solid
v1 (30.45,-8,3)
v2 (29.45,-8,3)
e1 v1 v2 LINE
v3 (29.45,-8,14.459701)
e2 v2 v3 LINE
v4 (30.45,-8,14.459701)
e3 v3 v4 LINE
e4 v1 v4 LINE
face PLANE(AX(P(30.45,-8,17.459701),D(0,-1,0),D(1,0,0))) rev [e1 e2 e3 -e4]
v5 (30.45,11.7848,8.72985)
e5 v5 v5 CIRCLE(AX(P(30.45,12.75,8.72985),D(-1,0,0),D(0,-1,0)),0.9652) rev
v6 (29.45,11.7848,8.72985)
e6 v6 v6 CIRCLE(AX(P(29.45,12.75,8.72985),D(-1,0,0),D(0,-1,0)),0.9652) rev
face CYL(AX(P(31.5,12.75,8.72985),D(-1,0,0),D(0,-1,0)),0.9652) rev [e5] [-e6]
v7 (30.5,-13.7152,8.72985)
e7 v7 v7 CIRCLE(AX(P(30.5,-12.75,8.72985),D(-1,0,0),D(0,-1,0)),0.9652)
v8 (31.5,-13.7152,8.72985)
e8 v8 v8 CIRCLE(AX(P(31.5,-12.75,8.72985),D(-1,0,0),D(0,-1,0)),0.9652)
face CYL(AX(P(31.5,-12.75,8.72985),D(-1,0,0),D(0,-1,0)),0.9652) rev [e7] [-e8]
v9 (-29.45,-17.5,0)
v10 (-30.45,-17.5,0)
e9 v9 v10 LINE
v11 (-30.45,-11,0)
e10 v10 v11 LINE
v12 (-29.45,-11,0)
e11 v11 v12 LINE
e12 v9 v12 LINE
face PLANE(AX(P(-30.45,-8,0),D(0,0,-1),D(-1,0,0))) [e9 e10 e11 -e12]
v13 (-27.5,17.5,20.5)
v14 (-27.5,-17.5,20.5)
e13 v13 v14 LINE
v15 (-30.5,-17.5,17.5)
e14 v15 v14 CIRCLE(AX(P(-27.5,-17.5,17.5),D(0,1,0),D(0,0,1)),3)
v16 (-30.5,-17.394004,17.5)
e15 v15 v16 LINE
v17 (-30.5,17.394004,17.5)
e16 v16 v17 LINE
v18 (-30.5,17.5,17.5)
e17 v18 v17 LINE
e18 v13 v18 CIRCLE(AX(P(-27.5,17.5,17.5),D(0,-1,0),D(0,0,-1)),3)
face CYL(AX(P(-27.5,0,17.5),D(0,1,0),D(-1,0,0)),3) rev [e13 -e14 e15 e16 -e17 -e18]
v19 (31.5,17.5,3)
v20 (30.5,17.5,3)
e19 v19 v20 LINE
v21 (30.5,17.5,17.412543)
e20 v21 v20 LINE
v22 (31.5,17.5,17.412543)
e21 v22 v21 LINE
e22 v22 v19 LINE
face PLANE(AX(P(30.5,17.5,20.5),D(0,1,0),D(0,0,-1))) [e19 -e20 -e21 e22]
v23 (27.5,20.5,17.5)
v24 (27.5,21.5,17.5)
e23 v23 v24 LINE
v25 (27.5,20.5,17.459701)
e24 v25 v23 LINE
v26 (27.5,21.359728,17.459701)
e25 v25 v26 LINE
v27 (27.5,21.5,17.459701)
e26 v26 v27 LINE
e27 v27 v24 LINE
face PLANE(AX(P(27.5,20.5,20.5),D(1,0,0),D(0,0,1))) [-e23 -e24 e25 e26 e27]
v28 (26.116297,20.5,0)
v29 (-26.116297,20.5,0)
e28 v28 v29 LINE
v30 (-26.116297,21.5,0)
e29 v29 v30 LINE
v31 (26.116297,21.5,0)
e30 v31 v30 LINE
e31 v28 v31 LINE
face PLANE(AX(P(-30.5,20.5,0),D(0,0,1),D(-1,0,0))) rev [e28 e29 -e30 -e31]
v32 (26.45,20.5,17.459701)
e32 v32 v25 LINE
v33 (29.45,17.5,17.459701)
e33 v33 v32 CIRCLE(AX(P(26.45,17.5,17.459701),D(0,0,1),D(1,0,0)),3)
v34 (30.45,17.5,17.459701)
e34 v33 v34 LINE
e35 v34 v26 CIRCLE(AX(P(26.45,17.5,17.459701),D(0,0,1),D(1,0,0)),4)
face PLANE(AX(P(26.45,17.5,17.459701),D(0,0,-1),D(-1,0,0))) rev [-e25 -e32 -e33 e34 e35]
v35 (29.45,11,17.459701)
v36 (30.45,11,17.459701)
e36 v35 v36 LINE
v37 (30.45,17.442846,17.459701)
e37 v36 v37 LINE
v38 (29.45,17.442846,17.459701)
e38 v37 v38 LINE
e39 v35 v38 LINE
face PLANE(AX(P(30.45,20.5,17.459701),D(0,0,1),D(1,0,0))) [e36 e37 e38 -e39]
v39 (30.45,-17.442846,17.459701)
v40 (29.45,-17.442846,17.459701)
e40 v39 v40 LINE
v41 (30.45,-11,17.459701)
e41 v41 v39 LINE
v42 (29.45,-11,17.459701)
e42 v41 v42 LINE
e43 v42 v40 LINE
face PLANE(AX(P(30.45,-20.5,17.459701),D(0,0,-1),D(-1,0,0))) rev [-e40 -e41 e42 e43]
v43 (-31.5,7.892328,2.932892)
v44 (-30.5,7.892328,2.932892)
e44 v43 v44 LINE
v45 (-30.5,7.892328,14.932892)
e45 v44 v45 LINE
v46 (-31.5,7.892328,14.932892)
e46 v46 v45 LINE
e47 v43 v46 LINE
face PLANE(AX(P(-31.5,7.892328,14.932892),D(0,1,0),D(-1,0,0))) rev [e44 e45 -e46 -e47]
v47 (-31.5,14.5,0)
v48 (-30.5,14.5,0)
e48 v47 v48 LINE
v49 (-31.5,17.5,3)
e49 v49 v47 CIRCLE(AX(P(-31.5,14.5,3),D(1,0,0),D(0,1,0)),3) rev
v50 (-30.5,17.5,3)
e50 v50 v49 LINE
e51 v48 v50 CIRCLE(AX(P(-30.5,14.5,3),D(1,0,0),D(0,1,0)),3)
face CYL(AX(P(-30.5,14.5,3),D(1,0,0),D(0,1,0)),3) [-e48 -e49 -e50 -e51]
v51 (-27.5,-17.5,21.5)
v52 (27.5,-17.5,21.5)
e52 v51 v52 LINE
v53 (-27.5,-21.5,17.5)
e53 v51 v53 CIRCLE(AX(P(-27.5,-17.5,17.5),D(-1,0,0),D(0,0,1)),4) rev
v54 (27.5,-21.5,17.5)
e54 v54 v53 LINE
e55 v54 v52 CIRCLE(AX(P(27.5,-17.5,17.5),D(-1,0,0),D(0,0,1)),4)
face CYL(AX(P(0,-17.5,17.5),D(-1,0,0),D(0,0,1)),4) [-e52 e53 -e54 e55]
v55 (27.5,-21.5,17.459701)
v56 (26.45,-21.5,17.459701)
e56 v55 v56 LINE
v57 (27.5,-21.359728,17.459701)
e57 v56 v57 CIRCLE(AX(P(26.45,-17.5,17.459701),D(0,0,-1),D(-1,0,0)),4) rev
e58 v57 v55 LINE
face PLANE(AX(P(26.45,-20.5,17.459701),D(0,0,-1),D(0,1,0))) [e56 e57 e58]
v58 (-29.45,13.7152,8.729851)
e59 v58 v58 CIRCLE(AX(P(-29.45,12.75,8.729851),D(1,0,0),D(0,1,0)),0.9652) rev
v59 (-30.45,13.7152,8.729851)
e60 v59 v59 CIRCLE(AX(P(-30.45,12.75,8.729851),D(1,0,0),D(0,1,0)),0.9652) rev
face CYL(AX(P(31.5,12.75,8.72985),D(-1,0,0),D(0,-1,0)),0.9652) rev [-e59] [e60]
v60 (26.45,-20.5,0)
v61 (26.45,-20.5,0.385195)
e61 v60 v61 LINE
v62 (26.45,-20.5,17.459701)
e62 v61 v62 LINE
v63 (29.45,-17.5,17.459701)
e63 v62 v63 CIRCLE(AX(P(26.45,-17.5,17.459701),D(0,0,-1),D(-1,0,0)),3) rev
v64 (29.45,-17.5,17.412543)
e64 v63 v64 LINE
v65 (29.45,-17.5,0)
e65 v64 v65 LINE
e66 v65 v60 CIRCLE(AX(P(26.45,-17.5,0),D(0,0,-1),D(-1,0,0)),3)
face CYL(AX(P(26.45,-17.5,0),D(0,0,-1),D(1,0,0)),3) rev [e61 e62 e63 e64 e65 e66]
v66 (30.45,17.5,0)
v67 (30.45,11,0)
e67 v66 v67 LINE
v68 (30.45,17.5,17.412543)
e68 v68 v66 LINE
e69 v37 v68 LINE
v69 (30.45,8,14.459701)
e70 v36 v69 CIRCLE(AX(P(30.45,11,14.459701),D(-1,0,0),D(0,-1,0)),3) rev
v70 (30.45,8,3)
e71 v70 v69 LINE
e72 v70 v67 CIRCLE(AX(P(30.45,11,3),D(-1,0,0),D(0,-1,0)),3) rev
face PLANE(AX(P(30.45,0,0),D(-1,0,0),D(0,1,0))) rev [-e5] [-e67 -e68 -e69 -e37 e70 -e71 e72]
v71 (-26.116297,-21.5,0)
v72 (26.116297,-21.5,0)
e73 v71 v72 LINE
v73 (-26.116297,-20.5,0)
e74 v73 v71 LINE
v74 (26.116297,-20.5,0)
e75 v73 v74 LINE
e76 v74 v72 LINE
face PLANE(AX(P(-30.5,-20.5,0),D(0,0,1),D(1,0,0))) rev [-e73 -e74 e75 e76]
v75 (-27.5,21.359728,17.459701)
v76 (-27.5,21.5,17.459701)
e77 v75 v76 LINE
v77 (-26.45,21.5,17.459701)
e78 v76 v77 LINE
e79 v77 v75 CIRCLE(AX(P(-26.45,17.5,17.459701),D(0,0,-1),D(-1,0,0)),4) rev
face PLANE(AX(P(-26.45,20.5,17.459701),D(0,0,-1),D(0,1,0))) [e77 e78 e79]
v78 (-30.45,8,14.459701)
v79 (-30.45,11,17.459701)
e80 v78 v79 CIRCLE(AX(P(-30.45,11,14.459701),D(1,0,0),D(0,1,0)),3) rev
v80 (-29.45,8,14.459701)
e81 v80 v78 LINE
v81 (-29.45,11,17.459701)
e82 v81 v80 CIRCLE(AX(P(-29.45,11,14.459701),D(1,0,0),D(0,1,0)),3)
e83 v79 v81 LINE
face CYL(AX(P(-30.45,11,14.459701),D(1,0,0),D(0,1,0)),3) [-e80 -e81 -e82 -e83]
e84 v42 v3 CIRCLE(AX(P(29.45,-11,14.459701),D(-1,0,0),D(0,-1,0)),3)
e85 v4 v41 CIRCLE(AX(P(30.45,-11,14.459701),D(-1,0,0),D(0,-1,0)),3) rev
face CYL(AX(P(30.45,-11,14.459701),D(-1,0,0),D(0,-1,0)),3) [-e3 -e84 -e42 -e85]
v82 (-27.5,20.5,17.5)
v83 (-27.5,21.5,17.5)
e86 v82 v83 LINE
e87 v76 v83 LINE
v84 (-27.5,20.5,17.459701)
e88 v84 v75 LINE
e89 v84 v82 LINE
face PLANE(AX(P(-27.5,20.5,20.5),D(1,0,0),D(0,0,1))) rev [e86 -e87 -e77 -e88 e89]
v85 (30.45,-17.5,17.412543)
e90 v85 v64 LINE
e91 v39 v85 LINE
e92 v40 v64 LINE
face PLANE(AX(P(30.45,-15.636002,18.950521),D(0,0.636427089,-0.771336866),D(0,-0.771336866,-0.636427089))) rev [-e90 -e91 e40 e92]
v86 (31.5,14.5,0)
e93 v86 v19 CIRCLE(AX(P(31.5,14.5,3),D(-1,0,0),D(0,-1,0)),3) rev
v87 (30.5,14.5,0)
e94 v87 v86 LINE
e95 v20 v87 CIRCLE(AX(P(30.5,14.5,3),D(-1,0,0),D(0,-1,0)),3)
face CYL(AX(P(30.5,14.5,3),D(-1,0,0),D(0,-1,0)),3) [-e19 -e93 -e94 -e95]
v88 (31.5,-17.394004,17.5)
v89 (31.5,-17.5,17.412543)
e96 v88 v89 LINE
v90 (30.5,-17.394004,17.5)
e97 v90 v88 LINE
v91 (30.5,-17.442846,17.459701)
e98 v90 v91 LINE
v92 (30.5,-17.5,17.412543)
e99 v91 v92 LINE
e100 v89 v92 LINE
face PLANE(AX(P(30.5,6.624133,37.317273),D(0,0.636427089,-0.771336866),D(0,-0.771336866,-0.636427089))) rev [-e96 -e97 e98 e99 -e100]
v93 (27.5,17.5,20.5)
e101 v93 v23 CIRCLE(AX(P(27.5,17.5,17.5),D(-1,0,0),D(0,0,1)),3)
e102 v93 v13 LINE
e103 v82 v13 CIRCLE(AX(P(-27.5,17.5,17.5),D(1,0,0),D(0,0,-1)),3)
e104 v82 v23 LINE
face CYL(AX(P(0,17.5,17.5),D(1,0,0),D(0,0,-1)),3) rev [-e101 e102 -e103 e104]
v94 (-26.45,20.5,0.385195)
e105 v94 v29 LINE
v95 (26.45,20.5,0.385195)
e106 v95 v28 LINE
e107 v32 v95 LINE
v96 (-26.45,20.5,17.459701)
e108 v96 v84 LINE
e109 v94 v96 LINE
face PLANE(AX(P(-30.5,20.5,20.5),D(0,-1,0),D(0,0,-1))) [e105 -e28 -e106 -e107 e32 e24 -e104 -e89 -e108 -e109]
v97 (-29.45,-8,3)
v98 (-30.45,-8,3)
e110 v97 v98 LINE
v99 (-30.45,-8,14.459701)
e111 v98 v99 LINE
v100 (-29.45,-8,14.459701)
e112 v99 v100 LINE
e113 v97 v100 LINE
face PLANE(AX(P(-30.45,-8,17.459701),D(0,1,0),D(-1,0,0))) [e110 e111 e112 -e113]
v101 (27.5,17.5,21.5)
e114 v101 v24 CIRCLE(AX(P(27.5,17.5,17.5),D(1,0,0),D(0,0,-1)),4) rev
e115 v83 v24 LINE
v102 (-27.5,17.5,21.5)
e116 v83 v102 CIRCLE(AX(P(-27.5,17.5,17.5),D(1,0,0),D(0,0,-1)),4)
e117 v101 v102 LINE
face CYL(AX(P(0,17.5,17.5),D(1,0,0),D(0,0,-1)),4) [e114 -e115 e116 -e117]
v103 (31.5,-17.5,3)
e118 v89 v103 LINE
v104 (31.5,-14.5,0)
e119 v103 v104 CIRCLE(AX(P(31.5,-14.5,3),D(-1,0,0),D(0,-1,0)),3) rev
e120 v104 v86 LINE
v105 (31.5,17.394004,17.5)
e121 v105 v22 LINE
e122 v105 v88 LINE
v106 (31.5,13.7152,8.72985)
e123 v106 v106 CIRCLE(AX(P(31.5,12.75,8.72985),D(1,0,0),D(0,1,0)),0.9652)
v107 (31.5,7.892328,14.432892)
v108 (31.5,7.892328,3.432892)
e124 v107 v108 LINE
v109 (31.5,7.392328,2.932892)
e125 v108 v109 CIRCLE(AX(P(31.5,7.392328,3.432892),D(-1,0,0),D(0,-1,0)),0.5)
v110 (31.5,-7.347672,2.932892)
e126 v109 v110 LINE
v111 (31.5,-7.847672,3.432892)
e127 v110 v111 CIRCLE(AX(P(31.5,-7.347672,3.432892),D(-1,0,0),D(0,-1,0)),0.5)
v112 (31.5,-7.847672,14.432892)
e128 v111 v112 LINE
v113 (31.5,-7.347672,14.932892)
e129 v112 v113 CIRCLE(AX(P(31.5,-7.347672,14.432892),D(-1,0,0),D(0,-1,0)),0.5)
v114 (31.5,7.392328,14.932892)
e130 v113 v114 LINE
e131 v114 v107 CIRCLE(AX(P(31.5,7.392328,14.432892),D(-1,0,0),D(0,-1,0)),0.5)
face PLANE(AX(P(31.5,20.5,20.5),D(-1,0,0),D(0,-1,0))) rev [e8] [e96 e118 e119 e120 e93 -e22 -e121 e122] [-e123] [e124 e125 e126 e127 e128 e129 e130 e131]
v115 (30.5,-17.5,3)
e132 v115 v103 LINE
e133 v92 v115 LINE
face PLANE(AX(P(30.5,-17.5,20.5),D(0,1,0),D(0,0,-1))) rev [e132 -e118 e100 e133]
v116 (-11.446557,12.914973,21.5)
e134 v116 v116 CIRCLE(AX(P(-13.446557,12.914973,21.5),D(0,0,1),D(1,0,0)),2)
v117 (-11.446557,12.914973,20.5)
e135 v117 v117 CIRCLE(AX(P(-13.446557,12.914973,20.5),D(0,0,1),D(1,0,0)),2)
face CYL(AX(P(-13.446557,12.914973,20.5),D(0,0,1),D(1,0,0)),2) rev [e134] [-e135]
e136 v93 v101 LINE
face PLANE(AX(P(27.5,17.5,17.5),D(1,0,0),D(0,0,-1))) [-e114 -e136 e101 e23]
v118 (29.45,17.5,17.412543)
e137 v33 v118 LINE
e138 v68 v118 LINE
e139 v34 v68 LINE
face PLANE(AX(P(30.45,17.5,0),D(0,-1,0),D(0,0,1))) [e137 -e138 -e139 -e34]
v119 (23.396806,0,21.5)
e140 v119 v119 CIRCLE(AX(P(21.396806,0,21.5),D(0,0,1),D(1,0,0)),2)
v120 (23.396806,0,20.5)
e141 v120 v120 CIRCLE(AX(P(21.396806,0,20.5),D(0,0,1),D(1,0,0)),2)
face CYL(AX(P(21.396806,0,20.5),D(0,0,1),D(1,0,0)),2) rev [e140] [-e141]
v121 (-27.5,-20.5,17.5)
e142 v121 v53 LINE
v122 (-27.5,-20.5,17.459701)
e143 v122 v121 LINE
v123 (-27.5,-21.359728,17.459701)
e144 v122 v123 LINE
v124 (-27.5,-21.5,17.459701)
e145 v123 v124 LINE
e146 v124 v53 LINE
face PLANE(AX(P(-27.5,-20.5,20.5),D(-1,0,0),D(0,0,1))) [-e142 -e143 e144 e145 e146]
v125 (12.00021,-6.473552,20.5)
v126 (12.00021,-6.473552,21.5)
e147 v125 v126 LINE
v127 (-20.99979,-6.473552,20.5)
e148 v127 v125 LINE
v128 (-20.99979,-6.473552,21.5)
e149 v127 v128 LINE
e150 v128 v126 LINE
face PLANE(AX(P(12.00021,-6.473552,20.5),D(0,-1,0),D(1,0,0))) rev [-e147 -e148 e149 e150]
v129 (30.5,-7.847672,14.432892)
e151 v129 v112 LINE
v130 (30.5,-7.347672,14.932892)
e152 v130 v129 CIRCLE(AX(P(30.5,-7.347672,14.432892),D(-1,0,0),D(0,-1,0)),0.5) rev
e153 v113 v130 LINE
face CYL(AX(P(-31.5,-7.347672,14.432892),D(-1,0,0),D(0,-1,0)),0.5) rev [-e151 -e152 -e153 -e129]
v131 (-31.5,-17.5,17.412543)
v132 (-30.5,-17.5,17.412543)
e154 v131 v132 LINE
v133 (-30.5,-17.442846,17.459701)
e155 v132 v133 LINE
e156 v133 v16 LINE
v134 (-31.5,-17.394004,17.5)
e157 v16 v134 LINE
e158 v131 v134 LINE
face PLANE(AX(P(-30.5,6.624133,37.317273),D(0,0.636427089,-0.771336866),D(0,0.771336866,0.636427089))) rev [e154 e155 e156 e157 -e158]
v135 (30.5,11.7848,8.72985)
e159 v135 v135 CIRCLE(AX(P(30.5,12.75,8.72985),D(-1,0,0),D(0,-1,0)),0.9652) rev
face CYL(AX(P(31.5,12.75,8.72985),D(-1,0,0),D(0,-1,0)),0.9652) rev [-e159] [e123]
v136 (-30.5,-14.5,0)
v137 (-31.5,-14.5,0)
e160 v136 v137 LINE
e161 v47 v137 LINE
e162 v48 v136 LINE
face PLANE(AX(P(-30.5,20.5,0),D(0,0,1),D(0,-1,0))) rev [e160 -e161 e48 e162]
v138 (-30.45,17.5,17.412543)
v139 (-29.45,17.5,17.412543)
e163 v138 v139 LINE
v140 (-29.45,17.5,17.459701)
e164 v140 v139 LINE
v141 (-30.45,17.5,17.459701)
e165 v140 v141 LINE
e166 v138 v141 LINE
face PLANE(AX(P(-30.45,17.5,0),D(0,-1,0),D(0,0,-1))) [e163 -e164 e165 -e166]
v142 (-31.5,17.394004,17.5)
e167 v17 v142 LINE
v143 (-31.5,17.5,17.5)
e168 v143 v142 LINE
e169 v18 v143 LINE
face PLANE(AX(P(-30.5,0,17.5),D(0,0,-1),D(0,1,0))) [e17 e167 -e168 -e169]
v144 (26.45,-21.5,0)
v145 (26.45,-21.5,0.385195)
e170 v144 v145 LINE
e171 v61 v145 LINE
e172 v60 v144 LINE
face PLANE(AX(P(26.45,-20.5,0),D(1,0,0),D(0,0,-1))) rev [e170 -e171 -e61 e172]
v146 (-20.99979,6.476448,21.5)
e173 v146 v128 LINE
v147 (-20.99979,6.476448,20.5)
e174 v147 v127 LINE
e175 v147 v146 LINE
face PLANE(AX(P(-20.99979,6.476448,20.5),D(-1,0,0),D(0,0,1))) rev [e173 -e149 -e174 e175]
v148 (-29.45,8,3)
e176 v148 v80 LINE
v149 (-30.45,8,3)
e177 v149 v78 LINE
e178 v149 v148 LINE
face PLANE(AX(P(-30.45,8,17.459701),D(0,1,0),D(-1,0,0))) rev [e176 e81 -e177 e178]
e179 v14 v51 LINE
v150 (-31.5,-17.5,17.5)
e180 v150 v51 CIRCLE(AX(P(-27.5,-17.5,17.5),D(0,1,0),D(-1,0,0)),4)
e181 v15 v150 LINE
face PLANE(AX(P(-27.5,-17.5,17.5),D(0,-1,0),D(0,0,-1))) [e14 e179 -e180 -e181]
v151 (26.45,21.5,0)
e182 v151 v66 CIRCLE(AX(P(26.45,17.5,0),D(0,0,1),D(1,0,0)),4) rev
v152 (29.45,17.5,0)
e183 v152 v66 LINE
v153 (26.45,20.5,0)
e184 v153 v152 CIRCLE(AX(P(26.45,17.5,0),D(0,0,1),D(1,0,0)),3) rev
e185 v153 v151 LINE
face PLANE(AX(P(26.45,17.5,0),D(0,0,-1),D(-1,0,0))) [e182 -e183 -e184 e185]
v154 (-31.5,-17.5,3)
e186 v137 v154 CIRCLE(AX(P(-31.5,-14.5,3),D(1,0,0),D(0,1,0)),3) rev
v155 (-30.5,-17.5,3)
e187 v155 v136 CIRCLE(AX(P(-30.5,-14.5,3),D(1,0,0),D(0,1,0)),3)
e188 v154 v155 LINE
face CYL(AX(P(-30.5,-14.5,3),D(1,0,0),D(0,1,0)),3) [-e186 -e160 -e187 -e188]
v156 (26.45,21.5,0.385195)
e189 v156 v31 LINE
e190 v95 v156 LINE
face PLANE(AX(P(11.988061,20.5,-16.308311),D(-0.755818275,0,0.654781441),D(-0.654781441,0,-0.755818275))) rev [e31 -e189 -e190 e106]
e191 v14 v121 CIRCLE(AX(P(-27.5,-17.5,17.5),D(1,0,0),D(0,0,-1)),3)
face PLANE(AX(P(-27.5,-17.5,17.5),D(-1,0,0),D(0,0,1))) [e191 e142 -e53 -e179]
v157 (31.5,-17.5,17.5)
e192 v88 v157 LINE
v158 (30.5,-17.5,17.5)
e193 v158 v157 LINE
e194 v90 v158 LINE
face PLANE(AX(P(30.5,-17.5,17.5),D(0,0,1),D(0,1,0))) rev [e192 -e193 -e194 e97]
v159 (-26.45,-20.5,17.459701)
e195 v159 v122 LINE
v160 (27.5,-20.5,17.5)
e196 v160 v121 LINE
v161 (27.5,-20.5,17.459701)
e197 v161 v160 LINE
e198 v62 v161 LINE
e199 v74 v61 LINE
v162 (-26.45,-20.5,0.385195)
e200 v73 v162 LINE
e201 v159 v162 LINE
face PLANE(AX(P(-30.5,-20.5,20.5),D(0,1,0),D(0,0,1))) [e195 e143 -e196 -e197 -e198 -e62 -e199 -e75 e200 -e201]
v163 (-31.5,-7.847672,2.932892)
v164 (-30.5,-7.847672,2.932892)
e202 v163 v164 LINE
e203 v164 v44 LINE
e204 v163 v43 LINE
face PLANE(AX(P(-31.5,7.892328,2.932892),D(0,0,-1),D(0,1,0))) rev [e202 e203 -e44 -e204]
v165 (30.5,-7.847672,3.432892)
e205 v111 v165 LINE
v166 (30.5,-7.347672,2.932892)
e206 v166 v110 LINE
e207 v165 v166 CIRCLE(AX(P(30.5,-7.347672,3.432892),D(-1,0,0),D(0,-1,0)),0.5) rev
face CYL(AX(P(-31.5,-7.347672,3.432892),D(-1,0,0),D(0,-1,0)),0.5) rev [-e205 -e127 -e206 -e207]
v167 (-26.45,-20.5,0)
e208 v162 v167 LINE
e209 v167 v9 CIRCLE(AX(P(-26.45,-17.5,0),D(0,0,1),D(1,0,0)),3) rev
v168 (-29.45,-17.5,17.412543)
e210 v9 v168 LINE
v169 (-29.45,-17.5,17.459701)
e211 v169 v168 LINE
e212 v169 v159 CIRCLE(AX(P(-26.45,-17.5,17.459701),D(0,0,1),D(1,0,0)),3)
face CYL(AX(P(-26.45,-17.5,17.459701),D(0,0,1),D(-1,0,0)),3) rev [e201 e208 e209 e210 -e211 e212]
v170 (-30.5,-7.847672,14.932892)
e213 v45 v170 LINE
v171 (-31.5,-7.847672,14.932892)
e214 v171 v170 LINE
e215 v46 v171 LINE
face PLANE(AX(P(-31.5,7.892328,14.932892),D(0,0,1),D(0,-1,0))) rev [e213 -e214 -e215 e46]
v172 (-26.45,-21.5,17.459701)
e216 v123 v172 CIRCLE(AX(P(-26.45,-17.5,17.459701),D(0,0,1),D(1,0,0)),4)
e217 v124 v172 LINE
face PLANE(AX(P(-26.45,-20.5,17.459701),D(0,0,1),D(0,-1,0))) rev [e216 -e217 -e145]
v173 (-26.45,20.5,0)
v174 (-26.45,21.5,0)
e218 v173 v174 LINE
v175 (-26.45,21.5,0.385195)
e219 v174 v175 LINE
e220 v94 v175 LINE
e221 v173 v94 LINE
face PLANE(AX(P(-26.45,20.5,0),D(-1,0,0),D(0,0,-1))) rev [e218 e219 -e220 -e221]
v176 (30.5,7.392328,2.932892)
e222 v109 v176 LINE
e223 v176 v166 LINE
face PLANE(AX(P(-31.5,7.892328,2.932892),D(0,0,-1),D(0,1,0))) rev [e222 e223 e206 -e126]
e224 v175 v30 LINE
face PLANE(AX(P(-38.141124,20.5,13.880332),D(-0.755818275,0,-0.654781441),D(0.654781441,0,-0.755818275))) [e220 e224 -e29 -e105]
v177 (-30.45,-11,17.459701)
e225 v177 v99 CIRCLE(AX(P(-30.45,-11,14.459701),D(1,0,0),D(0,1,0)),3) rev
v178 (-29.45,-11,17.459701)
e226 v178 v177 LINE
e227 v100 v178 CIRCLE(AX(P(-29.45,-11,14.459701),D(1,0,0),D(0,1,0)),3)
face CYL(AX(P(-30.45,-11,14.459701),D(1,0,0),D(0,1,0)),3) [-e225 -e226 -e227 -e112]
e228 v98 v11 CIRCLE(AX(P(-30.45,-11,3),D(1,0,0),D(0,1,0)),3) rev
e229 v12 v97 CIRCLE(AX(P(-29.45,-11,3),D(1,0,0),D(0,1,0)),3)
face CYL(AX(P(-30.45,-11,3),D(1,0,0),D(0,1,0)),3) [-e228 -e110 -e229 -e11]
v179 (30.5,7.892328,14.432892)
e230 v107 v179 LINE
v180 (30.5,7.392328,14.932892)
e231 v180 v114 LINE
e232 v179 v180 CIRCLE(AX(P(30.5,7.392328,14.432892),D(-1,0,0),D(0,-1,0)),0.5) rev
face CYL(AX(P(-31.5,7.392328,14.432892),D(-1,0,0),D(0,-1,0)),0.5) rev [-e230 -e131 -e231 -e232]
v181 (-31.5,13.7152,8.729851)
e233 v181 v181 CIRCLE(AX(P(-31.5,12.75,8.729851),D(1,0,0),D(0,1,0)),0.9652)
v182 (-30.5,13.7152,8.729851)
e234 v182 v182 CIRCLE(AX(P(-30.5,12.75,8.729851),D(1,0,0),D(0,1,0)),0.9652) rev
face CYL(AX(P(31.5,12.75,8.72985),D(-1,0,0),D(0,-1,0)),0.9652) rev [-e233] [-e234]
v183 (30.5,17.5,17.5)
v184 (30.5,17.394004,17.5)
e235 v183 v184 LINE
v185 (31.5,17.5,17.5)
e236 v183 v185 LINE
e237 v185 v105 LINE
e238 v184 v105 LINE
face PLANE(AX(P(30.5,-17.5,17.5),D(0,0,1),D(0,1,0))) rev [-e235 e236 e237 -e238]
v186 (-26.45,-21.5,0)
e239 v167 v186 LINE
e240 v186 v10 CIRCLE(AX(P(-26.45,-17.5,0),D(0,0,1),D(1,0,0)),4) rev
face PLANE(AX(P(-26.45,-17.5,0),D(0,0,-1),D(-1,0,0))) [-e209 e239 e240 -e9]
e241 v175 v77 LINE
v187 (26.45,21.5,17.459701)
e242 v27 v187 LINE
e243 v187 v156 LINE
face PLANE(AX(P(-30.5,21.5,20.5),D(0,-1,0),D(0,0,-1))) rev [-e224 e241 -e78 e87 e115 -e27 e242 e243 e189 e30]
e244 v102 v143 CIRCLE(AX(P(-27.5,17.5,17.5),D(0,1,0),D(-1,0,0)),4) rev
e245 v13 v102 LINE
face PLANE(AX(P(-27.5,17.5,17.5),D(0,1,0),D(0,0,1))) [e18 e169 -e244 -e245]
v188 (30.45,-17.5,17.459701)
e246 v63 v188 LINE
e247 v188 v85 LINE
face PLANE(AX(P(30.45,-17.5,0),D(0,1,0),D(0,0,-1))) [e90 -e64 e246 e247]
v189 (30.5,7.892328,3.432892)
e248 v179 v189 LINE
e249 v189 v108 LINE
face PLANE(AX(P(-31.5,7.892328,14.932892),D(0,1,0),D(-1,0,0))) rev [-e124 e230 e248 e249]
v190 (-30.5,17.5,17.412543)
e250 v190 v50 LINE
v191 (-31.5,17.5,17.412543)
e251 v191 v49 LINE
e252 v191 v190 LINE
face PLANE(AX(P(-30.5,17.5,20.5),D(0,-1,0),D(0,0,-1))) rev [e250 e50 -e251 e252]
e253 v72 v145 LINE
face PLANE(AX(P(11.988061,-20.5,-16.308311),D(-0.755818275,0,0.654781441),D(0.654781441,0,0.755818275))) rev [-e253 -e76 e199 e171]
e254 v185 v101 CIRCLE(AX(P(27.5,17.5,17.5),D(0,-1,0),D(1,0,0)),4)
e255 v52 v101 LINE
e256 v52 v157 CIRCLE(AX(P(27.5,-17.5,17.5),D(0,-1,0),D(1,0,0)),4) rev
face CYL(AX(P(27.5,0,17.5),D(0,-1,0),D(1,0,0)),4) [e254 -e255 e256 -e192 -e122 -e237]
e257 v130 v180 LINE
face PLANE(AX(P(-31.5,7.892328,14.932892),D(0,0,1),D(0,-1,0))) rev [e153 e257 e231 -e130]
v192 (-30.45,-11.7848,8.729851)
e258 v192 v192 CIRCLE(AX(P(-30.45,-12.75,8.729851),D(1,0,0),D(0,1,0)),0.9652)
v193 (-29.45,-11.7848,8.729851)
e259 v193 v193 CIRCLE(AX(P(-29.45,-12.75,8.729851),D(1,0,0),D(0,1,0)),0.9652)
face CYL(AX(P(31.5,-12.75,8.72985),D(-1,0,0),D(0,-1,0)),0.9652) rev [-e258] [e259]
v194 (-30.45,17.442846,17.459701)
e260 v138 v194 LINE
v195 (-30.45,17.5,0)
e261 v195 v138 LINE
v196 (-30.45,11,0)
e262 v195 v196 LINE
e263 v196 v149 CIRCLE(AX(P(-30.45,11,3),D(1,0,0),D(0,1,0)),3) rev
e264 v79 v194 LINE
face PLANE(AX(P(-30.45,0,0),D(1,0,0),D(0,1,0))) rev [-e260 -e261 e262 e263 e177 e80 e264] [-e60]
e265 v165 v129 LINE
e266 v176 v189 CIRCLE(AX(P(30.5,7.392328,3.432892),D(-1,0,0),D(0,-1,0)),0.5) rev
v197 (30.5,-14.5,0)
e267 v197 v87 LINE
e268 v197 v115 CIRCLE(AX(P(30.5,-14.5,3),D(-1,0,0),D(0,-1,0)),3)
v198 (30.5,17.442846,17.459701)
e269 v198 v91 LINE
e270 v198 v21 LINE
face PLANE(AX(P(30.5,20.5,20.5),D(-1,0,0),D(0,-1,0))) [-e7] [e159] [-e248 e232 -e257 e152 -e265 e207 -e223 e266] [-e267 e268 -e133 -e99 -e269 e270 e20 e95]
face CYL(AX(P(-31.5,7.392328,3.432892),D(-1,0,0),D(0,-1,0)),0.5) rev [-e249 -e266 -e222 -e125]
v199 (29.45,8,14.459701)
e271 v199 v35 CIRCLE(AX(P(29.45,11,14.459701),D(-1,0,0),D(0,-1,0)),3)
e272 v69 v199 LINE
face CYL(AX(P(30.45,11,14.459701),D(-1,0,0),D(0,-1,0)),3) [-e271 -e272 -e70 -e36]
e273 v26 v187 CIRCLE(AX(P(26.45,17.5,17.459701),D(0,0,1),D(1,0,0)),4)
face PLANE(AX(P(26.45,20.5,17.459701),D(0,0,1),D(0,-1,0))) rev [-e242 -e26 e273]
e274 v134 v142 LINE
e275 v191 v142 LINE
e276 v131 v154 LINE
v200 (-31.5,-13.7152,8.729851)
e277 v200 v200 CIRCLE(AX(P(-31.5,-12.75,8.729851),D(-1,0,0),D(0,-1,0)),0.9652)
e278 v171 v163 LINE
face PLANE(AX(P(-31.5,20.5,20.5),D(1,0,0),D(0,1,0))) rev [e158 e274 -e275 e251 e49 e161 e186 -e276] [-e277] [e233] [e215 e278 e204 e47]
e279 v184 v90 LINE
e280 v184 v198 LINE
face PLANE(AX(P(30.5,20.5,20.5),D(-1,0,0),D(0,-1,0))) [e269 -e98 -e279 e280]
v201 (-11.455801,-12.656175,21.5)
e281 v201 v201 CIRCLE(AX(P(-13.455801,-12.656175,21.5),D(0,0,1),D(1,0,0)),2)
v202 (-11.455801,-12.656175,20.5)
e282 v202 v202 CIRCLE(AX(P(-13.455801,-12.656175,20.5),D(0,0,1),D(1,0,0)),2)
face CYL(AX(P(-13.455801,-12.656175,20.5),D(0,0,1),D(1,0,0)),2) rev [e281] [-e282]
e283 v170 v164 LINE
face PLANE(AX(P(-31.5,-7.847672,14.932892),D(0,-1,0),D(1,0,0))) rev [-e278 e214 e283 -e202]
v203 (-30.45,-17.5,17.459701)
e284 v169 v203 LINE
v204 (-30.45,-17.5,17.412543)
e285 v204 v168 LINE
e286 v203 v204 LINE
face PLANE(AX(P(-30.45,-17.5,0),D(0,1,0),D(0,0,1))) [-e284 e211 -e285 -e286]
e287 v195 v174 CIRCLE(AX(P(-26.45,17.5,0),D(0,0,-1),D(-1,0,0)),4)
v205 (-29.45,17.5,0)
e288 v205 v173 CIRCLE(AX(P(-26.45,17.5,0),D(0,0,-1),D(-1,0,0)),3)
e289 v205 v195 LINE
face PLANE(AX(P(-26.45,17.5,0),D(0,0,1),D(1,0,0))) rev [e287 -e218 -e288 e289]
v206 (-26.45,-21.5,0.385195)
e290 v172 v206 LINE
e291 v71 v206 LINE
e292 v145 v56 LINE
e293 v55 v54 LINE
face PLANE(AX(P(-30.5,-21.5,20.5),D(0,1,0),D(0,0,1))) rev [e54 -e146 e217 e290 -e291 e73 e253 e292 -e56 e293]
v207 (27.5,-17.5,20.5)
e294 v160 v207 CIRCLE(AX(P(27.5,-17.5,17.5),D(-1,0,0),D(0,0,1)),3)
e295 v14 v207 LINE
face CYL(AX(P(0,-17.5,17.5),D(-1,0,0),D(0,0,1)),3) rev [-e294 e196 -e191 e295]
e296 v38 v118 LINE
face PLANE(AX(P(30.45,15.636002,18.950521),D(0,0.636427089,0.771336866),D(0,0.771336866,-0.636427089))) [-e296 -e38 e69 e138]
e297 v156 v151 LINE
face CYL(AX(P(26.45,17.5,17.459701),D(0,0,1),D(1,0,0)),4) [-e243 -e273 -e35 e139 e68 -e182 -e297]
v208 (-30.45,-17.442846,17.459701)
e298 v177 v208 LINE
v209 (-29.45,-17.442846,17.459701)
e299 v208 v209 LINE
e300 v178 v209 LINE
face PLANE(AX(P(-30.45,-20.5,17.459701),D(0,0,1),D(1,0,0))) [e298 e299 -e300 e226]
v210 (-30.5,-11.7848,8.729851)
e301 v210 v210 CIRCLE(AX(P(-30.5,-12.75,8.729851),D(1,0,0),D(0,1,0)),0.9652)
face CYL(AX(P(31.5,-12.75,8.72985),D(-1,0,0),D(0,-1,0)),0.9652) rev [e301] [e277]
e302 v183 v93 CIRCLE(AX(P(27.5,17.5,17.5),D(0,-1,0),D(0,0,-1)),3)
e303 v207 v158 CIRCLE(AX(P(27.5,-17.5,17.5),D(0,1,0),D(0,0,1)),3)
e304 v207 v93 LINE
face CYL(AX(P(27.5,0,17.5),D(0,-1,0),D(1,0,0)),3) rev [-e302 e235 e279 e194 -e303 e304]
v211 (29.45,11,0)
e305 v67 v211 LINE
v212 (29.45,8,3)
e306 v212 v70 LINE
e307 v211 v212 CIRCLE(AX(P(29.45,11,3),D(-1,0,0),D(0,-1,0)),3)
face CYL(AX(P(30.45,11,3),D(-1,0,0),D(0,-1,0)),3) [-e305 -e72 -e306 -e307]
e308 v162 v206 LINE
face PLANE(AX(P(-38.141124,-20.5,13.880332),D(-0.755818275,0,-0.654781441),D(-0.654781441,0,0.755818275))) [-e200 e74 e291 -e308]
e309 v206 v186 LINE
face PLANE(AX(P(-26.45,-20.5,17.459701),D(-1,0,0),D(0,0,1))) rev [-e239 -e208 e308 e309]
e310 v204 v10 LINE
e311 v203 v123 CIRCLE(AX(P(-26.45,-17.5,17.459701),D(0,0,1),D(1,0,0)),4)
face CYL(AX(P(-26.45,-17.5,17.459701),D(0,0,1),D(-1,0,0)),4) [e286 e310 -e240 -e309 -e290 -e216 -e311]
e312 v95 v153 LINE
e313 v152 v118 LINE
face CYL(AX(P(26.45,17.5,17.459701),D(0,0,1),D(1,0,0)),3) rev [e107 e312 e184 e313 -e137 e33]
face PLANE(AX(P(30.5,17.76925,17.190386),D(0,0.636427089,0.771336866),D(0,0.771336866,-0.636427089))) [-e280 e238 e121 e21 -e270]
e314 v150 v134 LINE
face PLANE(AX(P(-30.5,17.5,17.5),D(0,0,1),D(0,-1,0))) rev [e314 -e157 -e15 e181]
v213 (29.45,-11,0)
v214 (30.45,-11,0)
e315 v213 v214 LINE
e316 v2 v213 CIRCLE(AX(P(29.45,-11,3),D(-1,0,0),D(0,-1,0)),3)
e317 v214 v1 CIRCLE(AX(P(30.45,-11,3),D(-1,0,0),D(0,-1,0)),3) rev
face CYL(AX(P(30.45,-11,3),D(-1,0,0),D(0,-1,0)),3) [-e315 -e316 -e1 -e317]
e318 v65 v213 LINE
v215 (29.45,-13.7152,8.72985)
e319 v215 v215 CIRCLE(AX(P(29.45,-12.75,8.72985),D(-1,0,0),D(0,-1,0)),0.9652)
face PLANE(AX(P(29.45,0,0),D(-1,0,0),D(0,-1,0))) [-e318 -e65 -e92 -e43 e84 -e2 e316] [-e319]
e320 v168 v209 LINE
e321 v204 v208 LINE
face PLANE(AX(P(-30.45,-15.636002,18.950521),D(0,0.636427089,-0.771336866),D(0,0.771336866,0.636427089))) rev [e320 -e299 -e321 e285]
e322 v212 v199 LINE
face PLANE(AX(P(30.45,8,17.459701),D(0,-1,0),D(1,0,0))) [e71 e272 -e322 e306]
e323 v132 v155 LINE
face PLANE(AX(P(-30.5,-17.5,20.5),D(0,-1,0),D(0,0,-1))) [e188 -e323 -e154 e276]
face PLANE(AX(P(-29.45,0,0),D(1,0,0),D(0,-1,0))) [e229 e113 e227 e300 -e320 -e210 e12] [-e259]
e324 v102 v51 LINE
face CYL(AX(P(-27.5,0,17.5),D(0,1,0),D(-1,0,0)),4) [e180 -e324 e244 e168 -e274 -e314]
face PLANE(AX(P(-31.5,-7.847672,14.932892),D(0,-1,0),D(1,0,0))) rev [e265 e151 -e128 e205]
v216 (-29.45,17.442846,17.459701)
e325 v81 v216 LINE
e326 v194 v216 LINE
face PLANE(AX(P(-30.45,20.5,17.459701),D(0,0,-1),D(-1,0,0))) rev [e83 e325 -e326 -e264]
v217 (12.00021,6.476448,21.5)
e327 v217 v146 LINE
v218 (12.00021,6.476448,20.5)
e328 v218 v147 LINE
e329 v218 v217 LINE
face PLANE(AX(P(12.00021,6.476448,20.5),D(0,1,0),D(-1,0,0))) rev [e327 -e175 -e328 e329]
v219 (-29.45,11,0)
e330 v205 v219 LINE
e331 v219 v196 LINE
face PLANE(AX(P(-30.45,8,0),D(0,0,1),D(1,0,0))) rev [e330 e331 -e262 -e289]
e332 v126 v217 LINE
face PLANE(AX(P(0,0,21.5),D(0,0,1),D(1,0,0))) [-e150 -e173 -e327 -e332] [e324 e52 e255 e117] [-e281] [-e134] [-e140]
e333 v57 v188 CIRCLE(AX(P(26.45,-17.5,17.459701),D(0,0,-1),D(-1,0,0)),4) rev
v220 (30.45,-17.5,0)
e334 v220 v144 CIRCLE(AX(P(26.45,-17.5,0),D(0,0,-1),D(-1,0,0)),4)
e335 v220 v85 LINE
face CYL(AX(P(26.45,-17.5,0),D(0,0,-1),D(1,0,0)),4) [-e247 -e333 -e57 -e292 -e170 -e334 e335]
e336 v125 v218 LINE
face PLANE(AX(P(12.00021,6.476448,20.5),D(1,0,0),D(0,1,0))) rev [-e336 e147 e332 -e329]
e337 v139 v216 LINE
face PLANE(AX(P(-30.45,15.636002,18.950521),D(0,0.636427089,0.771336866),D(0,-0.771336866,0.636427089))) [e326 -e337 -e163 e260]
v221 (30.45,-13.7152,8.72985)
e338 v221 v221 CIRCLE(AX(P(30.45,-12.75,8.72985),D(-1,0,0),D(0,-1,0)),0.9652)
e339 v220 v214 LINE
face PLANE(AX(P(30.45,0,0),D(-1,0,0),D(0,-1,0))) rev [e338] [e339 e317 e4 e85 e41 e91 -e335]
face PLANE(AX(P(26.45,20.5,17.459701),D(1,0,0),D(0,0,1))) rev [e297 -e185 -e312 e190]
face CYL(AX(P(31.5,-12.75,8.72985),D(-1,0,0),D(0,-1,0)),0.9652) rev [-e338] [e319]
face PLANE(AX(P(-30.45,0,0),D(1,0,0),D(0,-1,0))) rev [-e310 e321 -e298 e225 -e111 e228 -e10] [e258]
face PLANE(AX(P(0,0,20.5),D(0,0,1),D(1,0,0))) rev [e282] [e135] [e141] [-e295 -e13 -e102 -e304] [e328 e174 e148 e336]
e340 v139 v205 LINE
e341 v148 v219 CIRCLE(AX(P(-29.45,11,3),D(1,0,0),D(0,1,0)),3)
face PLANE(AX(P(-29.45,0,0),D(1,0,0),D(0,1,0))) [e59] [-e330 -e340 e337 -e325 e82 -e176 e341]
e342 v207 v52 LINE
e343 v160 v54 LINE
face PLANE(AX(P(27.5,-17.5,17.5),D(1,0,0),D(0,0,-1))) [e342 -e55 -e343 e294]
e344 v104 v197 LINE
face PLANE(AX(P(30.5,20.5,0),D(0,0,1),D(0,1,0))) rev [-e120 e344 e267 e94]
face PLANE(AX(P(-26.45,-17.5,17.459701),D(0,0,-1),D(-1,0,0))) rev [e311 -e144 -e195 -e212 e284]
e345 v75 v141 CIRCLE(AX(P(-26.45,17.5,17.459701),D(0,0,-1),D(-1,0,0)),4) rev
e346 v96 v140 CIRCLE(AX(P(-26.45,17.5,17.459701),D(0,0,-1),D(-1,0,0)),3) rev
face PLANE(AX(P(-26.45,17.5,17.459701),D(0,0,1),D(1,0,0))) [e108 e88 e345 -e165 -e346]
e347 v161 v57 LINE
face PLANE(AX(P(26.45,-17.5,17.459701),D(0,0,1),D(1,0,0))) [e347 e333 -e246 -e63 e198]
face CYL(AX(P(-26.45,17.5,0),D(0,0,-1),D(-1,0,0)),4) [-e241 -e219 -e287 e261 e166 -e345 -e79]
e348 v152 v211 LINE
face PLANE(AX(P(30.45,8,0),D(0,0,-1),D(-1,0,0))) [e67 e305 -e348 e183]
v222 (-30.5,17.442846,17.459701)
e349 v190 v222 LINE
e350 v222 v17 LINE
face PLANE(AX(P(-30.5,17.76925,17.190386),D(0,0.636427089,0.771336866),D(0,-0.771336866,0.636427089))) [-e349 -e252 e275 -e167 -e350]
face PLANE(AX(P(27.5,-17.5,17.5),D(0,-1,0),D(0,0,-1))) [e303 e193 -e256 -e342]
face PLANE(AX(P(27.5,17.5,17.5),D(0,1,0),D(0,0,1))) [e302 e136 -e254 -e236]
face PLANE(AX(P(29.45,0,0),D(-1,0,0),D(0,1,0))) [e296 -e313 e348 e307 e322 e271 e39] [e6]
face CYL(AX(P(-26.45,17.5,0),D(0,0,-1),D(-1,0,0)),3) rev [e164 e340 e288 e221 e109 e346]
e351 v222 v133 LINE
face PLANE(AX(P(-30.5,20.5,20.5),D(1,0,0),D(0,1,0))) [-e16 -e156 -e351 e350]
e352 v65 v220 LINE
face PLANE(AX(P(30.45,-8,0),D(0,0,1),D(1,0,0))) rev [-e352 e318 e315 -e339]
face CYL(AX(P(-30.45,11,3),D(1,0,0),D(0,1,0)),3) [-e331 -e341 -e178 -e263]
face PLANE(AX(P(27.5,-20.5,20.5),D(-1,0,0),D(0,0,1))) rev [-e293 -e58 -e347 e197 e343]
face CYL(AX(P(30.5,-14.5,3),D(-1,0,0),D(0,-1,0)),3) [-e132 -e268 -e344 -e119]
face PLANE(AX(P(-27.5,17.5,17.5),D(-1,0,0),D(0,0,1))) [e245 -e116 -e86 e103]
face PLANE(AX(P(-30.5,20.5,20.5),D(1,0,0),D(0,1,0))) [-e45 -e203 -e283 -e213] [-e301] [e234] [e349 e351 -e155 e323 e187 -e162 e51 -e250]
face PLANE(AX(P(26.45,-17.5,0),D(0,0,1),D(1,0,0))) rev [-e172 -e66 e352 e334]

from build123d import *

# Parameters (mm, degrees)
SKETCH1_W                        = 61
SKETCH1_H                        = 41
MAIN_BODY_DEPTH                  = 20.5
CONVERT_SOLID1_START             = -30.5
CONVERT_SOLID1_DEPTH             = 61
CONVERT_SOLID1_2_DEPTH           = 3
CONVERT_SOLID1_START_2           = 27.5
CONVERT_SOLID1_3_DEPTH           = 3
CONVERT_SOLID1_START_3           = -27.5
CONVERT_SOLID1_4_DEPTH           = 55
CONVERT_SOLID1_5_OUTLINE_W       = 1
CONVERT_SOLID1_5_OUTLINE_H       = 17.459701
CONVERT_SOLID1_5_DEPTH           = 61
CONVERT_SOLID1_START_4           = -17.5
CONVERT_SOLID1_6_DEPTH           = 35
CONVERT_SOLID1_7_DEPTH           = 35
CONVERT_SOLID1_8_DEPTH           = 61
SKETCH11_W                       = 0.05
SKETCH11_H                       = 17.459701
TRIM_FOR_TABS_DEPTH              = 58.476081982
CORNER_TAB_STRIP_W               = 10
CORNER_TAB_STRIP_H               = 1
CORNER_TAB_STRIP_CUT_DEPTH       = 17.459701
CORNER_TAB_DEPTH                 = 17.459701
TAB_MIRROR_HORIZ_COPY_1_SKETCH_W = 10
TAB_MIRROR_HORIZ_COPY_1_SKETCH_H = 1
TAB_MIRROR_HORIZ_COPY_1_DEPTH    = 17.459701
TAB_MIRROR_HORIZ_COPY_2_DEPTH    = 17.459701
SKETCH16_R                       = 0.9652
SCREW_HOLES_DEPTH                = 69.113159521
RJ45_HOLES_DEPTH                 = 70.953556021
RJ45_HOLES_DEPTH_BACK            = 70.953556021
SKETCH17_W                       = 12
SKETCH17_H                       = 15.74
FILLET1_R                        = 0.5
SKETCH18_R                       = 2
SKETCH18_W                       = 33
SKETCH18_H                       = 12.95
CUT_EXTRUDE4_DEPTH               = 10
BREAK_CORNER1_START              = -30.5
BREAK_CORNER1_DEPTH              = 61
BREAK_CORNER1_START_2            = -32
BREAK_CORNER1_2_DEPTH            = 1.55
BREAK_CORNER1_START_3            = 30.45
BREAK_CORNER1_3_DEPTH            = 1.55
FOLD_MARKING_NOTCHES_DEPTH       = 58.476081982
FOLD_MARKING_NOTCHES_2_DEPTH     = 70.953556021


with BuildPart() as part:
    # Sketch1 → main body (new body)
    with BuildSketch(Plane.XY):
        Rectangle(SKETCH1_W, SKETCH1_H)
    extrude(amount=MAIN_BODY_DEPTH)

    # Convert-Solid1: read off the stored shape, not the designer's step
    # Convert-Solid1 outline → Convert-Solid1 (cut)
    with BuildSketch(Plane.YZ.offset(CONVERT_SOLID1_START)):
        with BuildLine():
            Line((17.5, 20.5), (17.5, 0))
            Line((17.5, 0), (20.5, 0))
            Line((20.5, 0), (20.5, 17.5))
            ThreePointArc((20.5, 17.5), (19.621320344, 19.621320344), (17.5, 20.5))
        make_face()
        with BuildLine():
            Line((-20.5, 0), (-17.5, 0))
            Line((-17.5, 0), (-17.5, 20.5))
            ThreePointArc((-17.5, 20.5), (-19.621320344, 19.621320344), (-20.5, 17.5))
            Line((-20.5, 17.5), (-20.5, 0))
        make_face()
    extrude(amount=CONVERT_SOLID1_DEPTH, mode=Mode.SUBTRACT)

    # Convert-Solid1 2 outline → Convert-Solid1 2 (cut)
    with BuildSketch(Plane.YZ.offset(CONVERT_SOLID1_START)):
        with BuildLine():
            Line((17.5, 21.5), (17.5, 20.5))
            ThreePointArc((17.5, 20.5), (19.621320344, 19.621320344), (20.5, 17.5))
            Line((20.5, 17.5), (20.5, 20.145751312))
            ThreePointArc((20.5, 20.145751312), (19.145751311, 21.145751311), (17.5, 21.5))
        make_face()
        with BuildLine():
            ThreePointArc((-20.5, 17.5), (-19.621320344, 19.621320344), (-17.5, 20.5))
            Line((-17.5, 20.5), (-17.5, 21.5))
            ThreePointArc((-17.5, 21.5), (-19.145751311, 21.145751311), (-20.5, 20.145751312))
            Line((-20.5, 20.145751312), (-20.5, 17.5))
        make_face()
    extrude(amount=CONVERT_SOLID1_2_DEPTH, mode=Mode.SUBTRACT)

    # Convert-Solid1 3 outline → Convert-Solid1 3 (cut)
    with BuildSketch(Plane.YZ.offset(CONVERT_SOLID1_START_2)):
        with BuildLine():
            Line((17.5, 21.5), (17.5, 20.5))
            ThreePointArc((17.5, 20.5), (19.621320344, 19.621320344), (20.5, 17.5))
            Line((20.5, 17.5), (20.5, 20.145751312))
            ThreePointArc((20.5, 20.145751312), (19.145751311, 21.145751311), (17.5, 21.5))
        make_face()
        with BuildLine():
            ThreePointArc((-20.5, 17.5), (-19.621320344, 19.621320344), (-17.5, 20.5))
            Line((-17.5, 20.5), (-17.5, 21.5))
            ThreePointArc((-17.5, 21.5), (-19.145751311, 21.145751311), (-20.5, 20.145751312))
            Line((-20.5, 20.145751312), (-20.5, 17.5))
        make_face()
    extrude(amount=CONVERT_SOLID1_3_DEPTH, mode=Mode.SUBTRACT)

    # Convert-Solid1 4 outline → Convert-Solid1 4 (add)
    with BuildSketch(Plane.YZ.offset(CONVERT_SOLID1_START_3)):
        with BuildLine():
            Line((20.5, 0), (21.5, 0))
            Line((21.5, 0), (21.5, 17.5))
            ThreePointArc((21.5, 17.5), (20.328427125, 20.328427125), (17.5, 21.5))
            Line((17.5, 21.5), (17.5, 20.5))
            ThreePointArc((17.5, 20.5), (19.621320344, 19.621320344), (20.5, 17.5))
            Line((20.5, 17.5), (20.5, 0))
        make_face()
        with BuildLine():
            Line((-21.5, 0), (-20.5, 0))
            Line((-20.5, 0), (-20.5, 17.5))
            ThreePointArc((-20.5, 17.5), (-19.621320344, 19.621320344), (-17.5, 20.5))
            Line((-17.5, 20.5), (-17.5, 21.5))
            ThreePointArc((-17.5, 21.5), (-20.328427125, 20.328427125), (-21.5, 17.5))
            Line((-21.5, 17.5), (-21.5, 0))
        make_face()
    extrude(amount=CONVERT_SOLID1_4_DEPTH)

    # Convert-Solid1 5 outline → Convert-Solid1 5 (add)
    with BuildSketch(Plane.YZ.offset(CONVERT_SOLID1_START)):
        with Locations((21, 8.7298505)):
            Rectangle(CONVERT_SOLID1_5_OUTLINE_W, CONVERT_SOLID1_5_OUTLINE_H)
        with Locations((-21, 8.7298505)):
            Rectangle(CONVERT_SOLID1_5_OUTLINE_W, CONVERT_SOLID1_5_OUTLINE_H)
    extrude(amount=CONVERT_SOLID1_5_DEPTH)

    # Convert-Solid1 6 outline → Convert-Solid1 6 (add)
    with BuildSketch(Plane(origin=(0, 0, 0), x_dir=(1, 0, 0), z_dir=(0, 1, 0)).offset(CONVERT_SOLID1_START_4)):
        with BuildLine():
            Line((31.5, 0), (30.5, 0))
            Line((30.5, 0), (30.5, -20.145751312))
            ThreePointArc((30.5, -20.145751312), (31.241657387, -18.914213563), (31.5, -17.5))
            Line((31.5, -17.5), (31.5, 0))
        make_face()
        with BuildLine():
            Line((-30.5, -20.145751312), (-30.5, 0))
            Line((-30.5, 0), (-31.5, 0))
            Line((-31.5, 0), (-31.5, -17.5))
            ThreePointArc((-31.5, -17.5), (-31.241657387, -18.914213563), (-30.5, -20.145751312))
        make_face()
        with BuildLine():
            Line((30.145751312, -20.5), (-30.145751312, -20.5))
            ThreePointArc((-30.145751312, -20.5), (-28.914213563, -21.241657387), (-27.5, -21.5))
            Line((-27.5, -21.5), (27.5, -21.5))
            ThreePointArc((27.5, -21.5), (28.914213563, -21.241657387), (30.145751312, -20.5))
        make_face()
    extrude(amount=CONVERT_SOLID1_6_DEPTH)

    # Convert-Solid1 7 outline → Convert-Solid1 7 (cut)
    with BuildSketch(Plane(origin=(0, 0, 0), x_dir=(1, 0, 0), z_dir=(0, 1, 0)).offset(CONVERT_SOLID1_START_4)):
        with BuildLine():
            Line((30.5, -17.5), (30.5, 0))
            Line((30.5, 0), (-30.5, 0))
            Line((-30.5, 0), (-30.5, -17.5))
            ThreePointArc((-30.5, -17.5), (-29.621320344, -19.621320344), (-27.5, -20.5))
            Line((-27.5, -20.5), (27.5, -20.5))
            ThreePointArc((27.5, -20.5), (29.621320344, -19.621320344), (30.5, -17.5))
        make_face()
        with BuildLine():
            Line((30.5, -20.5), (30.5, -20.145751312))
            ThreePointArc((30.5, -20.145751312), (30.328427125, -20.328427125), (30.145751312, -20.5))
            Line((30.145751312, -20.5), (30.5, -20.5))
        make_face()
        with BuildLine():
            ThreePointArc((-30.145751312, -20.5), (-30.328427125, -20.328427125), (-30.5, -20.145751312))
            Line((-30.5, -20.145751312), (-30.5, -20.5))
            Line((-30.5, -20.5), (-30.145751312, -20.5))
        make_face()
    extrude(amount=CONVERT_SOLID1_7_DEPTH, mode=Mode.SUBTRACT)

    # Convert-Solid1 8 outline → Convert-Solid1 8 (cut)
    with BuildSketch(Plane.YZ.offset(CONVERT_SOLID1_START)):
        with BuildLine():
            ThreePointArc((20.145751312, 20.5), (20.328427125, 20.328427125), (20.5, 20.145751312))
            Line((20.5, 20.145751312), (20.5, 20.5))
            Line((20.5, 20.5), (20.145751312, 20.5))
        make_face()
        with BuildLine():
            ThreePointArc((-20.5, 20.145751312), (-20.328427125, 20.328427125), (-20.145751312, 20.5))
            Line((-20.145751312, 20.5), (-20.5, 20.5))
            Line((-20.5, 20.5), (-20.5, 20.145751312))
        make_face()
    extrude(amount=CONVERT_SOLID1_8_DEPTH, mode=Mode.SUBTRACT)

    # Sketch11 → trim for tabs (cut, through all)
    with BuildSketch(Plane.XZ.offset(21.5)):
        with Locations((-30.475, 8.7298505)):
            Rectangle(SKETCH11_W, SKETCH11_H)
    trim_for_tabs = extrude(amount=-TRIM_FOR_TABS_DEPTH, mode=Mode.SUBTRACT)

    # mirror trim: trim for tabs across plane
    add(trim_for_tabs.mirror(Plane(origin=(0, 0, 0), x_dir=(0, 0, 1), z_dir=(1, 0, 0))), mode=Mode.SUBTRACT)

    # corner tab: sheet metal written as solids
    # corner tab strip (on a plane across the edge) → corner tab strip cut (cut)
    with BuildSketch(Plane(origin=(30.45, -20.5, 17.459701), x_dir=(-1, 0, 0), z_dir=(0, 0, -1))):
        with Locations((-1, -0.5)):
            Rectangle(CORNER_TAB_STRIP_W, CORNER_TAB_STRIP_H)
    corner_tab_strip_cut = extrude(amount=CORNER_TAB_STRIP_CUT_DEPTH, mode=Mode.SUBTRACT)

    # corner tab section (on a plane across the edge) → corner tab (add)
    with BuildSketch(Plane(origin=(30.45, -20.5, 17.459701), x_dir=(-1, 0, 0), z_dir=(0, 0, -1))):
        with BuildLine():
            Line((0, 3), (0, 12.5))
            Line((0, 12.5), (1, 12.5))
            Line((1, 12.5), (1, 3))
            ThreePointArc((1, 3), (1.878679656, 0.878679656), (4, 0))
            Line((4, 0), (4, -1))
            ThreePointArc((4, -1), (1.171572875, 0.171572875), (0, 3))
        make_face()
    corner_tab = extrude(amount=CORNER_TAB_DEPTH)

    # tab mirror vert: corner tab strip cut, corner tab across plane
    add(corner_tab_strip_cut.mirror(Plane.ZX), mode=Mode.SUBTRACT)
    add(corner_tab.mirror(Plane.ZX))

    # tab mirror horiz: corner tab strip cut, corner tab across plane
    add(corner_tab_strip_cut.mirror(Plane(origin=(0, 0, 0), x_dir=(0, 0, 1), z_dir=(1, 0, 0))), mode=Mode.SUBTRACT)
    add(corner_tab.mirror(Plane(origin=(0, 0, 0), x_dir=(0, 0, 1), z_dir=(1, 0, 0))))

    # tab mirror horiz copy 1 sketch → tab mirror horiz copy 1 (cut)
    with BuildSketch(Plane(origin=(-30.45, 20.5, 17.459701), x_dir=(1, 0, 0), z_dir=(0, 0, -1))):
        with Locations((-1, -0.5)):
            Rectangle(TAB_MIRROR_HORIZ_COPY_1_SKETCH_W, TAB_MIRROR_HORIZ_COPY_1_SKETCH_H)
    extrude(amount=TAB_MIRROR_HORIZ_COPY_1_DEPTH, mode=Mode.SUBTRACT)

    # tab mirror horiz copy 2 sketch → tab mirror horiz copy 2 (add)
    with BuildSketch(Plane(origin=(-30.45, 20.5, 17.459701), x_dir=(1, 0, 0), z_dir=(0, 0, -1))):
        with BuildLine():
            Line((0, 3), (0, 12.5))
            Line((0, 12.5), (1, 12.5))
            Line((1, 12.5), (1, 3))
            ThreePointArc((1, 3), (1.878679656, 0.878679656), (4, 0))
            Line((4, 0), (4, -1))
            ThreePointArc((4, -1), (1.171572875, 0.171572875), (0, 3))
        make_face()
    extrude(amount=TAB_MIRROR_HORIZ_COPY_2_DEPTH)

    # Sketch16 → screw holes (cut, symmetric)
    with BuildSketch(Plane.ZY.offset(-29.45)):
        with Locations(Location((8.7298505, -12.75, 0), (0, 0, 90))):
            Circle(SKETCH16_R)
    screw_holes = extrude(amount=SCREW_HOLES_DEPTH, both=True, mode=Mode.SUBTRACT)

    # mirror screw holes vert: screw holes across plane
    add(screw_holes.mirror(Plane.ZX), mode=Mode.SUBTRACT)

    # Sketch17 → rj45 holes (cut, two sides: drawn at the far end of the back side and taken through both)
    with BuildSketch(Plane(origin=(31.5, 0, 0), x_dir=(0, 0, -1), z_dir=(1, 0, 0)).offset(-RJ45_HOLES_DEPTH_BACK)):
        with Locations((-8.932892141, 0.022328393)):
            Rectangle(SKETCH17_W, SKETCH17_H)
    extrude(amount=RJ45_HOLES_DEPTH + RJ45_HOLES_DEPTH_BACK, mode=Mode.SUBTRACT)

    # Fillet1
    fillet1_edges = [part.edges().sort_by_distance(p)[0] for p in [
        (31, 7.892328393, 2.932892141),
        (31, -7.847671607, 2.932892141),
        (31, -7.847671607, 14.932892141),
        (31, 7.892328393, 14.932892141),
    ]]
    fillet(fillet1_edges, radius=FILLET1_R)

    # Sketch18 → Cut-Extrude4 (cut)
    with BuildSketch(Plane.XY.offset(21.5)):
        with Locations((21.396805659, 0)):
            Circle(SKETCH18_R)
        with Locations((-13.446557004, 12.9149731)):
            Circle(SKETCH18_R)
        with Locations((-13.455800947, -12.656174973)):
            Circle(SKETCH18_R)
        with Locations((-4.499790271, 0.001448065)):
            Rectangle(SKETCH18_W, SKETCH18_H)
    extrude(amount=-CUT_EXTRUDE4_DEPTH, mode=Mode.SUBTRACT)

    # Break-Corner1: read off the stored shape, not the designer's step
    # Break-Corner1 outline → Break-Corner1 (cut)
    with BuildSketch(Plane.YZ.offset(BREAK_CORNER1_START)):
        with BuildLine():
            ThreePointArc((-11, 17.459701), (-8.878679656, 16.581021344), (-8, 14.459701))
            Line((-8, 14.459701), (-8, 17.459701))
            Line((-8, 17.459701), (-11, 17.459701))
        make_face()
        with BuildLine():
            Line((-8, 0), (-8, 3))
            ThreePointArc((-8, 3), (-8.878679656, 0.878679656), (-11, 0))
            Line((-11, 0), (-8, 0))
        make_face()
        with BuildLine():
            ThreePointArc((8, 14.459701), (8.878679656, 16.581021344), (11, 17.459701))
            Line((11, 17.459701), (8, 17.459701))
            Line((8, 17.459701), (8, 14.459701))
        make_face()
        with BuildLine():
            ThreePointArc((11, 0), (8.878679656, 0.878679656), (8, 3))
            Line((8, 3), (8, 0))
            Line((8, 0), (11, 0))
        make_face()
    extrude(amount=BREAK_CORNER1_DEPTH, mode=Mode.SUBTRACT)

    # Break-Corner1 2 outline → Break-Corner1 2 (cut)
    with BuildSketch(Plane.YZ.offset(BREAK_CORNER1_START_2)):
        with BuildLine():
            ThreePointArc((-14.5, 0), (-16.621320344, 0.878679656), (-17.5, 3))
            Line((-17.5, 3), (-17.5, 0))
            Line((-17.5, 0), (-14.5, 0))
        make_face()
        with BuildLine():
            Line((17.5, 0), (17.5, 3))
            ThreePointArc((17.5, 3), (16.621320344, 0.878679656), (14.5, 0))
            Line((14.5, 0), (17.5, 0))
        make_face()
    extrude(amount=BREAK_CORNER1_2_DEPTH, mode=Mode.SUBTRACT)

    # Break-Corner1 3 outline → Break-Corner1 3 (cut)
    with BuildSketch(Plane.YZ.offset(BREAK_CORNER1_START_3)):
        with BuildLine():
            ThreePointArc((-14.5, 0), (-16.621320344, 0.878679656), (-17.5, 3))
            Line((-17.5, 3), (-17.5, 0))
            Line((-17.5, 0), (-14.5, 0))
        make_face()
        with BuildLine():
            Line((17.5, 0), (17.5, 3))
            ThreePointArc((17.5, 3), (16.621320344, 0.878679656), (14.5, 0))
            Line((14.5, 0), (17.5, 0))
        make_face()
    extrude(amount=BREAK_CORNER1_3_DEPTH, mode=Mode.SUBTRACT)

    # Sketch19 → fold marking notches (cut, through all)
    with BuildSketch(Plane(origin=(0, 21.5, 0), x_dir=(1, 0, 0), z_dir=(0, 1, 0))):
        Polygon((26.116297313, 0), (26.45, -0.385195079), (26.45, 0), align=None)
    fold_marking_notches = extrude(amount=-FOLD_MARKING_NOTCHES_DEPTH, mode=Mode.SUBTRACT)

    # mirror fold marking notches: fold marking notches across plane
    add(fold_marking_notches.mirror(Plane(origin=(0, 0, 0), x_dir=(0, 0, 1), z_dir=(1, 0, 0))), mode=Mode.SUBTRACT)

    # Sketch20 → fold marking notches 2 (cut, through all)
    with BuildSketch(Plane.ZY.offset(31.5)):
        Polygon((17.5, -17.5), (17.5, -17.394004016), (17.41254312, -17.5), align=None)
    fold_marking_notches_2 = extrude(amount=-FOLD_MARKING_NOTCHES_2_DEPTH, mode=Mode.SUBTRACT)

    # mirror fold marking notches vert: fold marking notches 2 across plane
    add(fold_marking_notches_2.mirror(Plane.ZX), mode=Mode.SUBTRACT)


solid = part.part
